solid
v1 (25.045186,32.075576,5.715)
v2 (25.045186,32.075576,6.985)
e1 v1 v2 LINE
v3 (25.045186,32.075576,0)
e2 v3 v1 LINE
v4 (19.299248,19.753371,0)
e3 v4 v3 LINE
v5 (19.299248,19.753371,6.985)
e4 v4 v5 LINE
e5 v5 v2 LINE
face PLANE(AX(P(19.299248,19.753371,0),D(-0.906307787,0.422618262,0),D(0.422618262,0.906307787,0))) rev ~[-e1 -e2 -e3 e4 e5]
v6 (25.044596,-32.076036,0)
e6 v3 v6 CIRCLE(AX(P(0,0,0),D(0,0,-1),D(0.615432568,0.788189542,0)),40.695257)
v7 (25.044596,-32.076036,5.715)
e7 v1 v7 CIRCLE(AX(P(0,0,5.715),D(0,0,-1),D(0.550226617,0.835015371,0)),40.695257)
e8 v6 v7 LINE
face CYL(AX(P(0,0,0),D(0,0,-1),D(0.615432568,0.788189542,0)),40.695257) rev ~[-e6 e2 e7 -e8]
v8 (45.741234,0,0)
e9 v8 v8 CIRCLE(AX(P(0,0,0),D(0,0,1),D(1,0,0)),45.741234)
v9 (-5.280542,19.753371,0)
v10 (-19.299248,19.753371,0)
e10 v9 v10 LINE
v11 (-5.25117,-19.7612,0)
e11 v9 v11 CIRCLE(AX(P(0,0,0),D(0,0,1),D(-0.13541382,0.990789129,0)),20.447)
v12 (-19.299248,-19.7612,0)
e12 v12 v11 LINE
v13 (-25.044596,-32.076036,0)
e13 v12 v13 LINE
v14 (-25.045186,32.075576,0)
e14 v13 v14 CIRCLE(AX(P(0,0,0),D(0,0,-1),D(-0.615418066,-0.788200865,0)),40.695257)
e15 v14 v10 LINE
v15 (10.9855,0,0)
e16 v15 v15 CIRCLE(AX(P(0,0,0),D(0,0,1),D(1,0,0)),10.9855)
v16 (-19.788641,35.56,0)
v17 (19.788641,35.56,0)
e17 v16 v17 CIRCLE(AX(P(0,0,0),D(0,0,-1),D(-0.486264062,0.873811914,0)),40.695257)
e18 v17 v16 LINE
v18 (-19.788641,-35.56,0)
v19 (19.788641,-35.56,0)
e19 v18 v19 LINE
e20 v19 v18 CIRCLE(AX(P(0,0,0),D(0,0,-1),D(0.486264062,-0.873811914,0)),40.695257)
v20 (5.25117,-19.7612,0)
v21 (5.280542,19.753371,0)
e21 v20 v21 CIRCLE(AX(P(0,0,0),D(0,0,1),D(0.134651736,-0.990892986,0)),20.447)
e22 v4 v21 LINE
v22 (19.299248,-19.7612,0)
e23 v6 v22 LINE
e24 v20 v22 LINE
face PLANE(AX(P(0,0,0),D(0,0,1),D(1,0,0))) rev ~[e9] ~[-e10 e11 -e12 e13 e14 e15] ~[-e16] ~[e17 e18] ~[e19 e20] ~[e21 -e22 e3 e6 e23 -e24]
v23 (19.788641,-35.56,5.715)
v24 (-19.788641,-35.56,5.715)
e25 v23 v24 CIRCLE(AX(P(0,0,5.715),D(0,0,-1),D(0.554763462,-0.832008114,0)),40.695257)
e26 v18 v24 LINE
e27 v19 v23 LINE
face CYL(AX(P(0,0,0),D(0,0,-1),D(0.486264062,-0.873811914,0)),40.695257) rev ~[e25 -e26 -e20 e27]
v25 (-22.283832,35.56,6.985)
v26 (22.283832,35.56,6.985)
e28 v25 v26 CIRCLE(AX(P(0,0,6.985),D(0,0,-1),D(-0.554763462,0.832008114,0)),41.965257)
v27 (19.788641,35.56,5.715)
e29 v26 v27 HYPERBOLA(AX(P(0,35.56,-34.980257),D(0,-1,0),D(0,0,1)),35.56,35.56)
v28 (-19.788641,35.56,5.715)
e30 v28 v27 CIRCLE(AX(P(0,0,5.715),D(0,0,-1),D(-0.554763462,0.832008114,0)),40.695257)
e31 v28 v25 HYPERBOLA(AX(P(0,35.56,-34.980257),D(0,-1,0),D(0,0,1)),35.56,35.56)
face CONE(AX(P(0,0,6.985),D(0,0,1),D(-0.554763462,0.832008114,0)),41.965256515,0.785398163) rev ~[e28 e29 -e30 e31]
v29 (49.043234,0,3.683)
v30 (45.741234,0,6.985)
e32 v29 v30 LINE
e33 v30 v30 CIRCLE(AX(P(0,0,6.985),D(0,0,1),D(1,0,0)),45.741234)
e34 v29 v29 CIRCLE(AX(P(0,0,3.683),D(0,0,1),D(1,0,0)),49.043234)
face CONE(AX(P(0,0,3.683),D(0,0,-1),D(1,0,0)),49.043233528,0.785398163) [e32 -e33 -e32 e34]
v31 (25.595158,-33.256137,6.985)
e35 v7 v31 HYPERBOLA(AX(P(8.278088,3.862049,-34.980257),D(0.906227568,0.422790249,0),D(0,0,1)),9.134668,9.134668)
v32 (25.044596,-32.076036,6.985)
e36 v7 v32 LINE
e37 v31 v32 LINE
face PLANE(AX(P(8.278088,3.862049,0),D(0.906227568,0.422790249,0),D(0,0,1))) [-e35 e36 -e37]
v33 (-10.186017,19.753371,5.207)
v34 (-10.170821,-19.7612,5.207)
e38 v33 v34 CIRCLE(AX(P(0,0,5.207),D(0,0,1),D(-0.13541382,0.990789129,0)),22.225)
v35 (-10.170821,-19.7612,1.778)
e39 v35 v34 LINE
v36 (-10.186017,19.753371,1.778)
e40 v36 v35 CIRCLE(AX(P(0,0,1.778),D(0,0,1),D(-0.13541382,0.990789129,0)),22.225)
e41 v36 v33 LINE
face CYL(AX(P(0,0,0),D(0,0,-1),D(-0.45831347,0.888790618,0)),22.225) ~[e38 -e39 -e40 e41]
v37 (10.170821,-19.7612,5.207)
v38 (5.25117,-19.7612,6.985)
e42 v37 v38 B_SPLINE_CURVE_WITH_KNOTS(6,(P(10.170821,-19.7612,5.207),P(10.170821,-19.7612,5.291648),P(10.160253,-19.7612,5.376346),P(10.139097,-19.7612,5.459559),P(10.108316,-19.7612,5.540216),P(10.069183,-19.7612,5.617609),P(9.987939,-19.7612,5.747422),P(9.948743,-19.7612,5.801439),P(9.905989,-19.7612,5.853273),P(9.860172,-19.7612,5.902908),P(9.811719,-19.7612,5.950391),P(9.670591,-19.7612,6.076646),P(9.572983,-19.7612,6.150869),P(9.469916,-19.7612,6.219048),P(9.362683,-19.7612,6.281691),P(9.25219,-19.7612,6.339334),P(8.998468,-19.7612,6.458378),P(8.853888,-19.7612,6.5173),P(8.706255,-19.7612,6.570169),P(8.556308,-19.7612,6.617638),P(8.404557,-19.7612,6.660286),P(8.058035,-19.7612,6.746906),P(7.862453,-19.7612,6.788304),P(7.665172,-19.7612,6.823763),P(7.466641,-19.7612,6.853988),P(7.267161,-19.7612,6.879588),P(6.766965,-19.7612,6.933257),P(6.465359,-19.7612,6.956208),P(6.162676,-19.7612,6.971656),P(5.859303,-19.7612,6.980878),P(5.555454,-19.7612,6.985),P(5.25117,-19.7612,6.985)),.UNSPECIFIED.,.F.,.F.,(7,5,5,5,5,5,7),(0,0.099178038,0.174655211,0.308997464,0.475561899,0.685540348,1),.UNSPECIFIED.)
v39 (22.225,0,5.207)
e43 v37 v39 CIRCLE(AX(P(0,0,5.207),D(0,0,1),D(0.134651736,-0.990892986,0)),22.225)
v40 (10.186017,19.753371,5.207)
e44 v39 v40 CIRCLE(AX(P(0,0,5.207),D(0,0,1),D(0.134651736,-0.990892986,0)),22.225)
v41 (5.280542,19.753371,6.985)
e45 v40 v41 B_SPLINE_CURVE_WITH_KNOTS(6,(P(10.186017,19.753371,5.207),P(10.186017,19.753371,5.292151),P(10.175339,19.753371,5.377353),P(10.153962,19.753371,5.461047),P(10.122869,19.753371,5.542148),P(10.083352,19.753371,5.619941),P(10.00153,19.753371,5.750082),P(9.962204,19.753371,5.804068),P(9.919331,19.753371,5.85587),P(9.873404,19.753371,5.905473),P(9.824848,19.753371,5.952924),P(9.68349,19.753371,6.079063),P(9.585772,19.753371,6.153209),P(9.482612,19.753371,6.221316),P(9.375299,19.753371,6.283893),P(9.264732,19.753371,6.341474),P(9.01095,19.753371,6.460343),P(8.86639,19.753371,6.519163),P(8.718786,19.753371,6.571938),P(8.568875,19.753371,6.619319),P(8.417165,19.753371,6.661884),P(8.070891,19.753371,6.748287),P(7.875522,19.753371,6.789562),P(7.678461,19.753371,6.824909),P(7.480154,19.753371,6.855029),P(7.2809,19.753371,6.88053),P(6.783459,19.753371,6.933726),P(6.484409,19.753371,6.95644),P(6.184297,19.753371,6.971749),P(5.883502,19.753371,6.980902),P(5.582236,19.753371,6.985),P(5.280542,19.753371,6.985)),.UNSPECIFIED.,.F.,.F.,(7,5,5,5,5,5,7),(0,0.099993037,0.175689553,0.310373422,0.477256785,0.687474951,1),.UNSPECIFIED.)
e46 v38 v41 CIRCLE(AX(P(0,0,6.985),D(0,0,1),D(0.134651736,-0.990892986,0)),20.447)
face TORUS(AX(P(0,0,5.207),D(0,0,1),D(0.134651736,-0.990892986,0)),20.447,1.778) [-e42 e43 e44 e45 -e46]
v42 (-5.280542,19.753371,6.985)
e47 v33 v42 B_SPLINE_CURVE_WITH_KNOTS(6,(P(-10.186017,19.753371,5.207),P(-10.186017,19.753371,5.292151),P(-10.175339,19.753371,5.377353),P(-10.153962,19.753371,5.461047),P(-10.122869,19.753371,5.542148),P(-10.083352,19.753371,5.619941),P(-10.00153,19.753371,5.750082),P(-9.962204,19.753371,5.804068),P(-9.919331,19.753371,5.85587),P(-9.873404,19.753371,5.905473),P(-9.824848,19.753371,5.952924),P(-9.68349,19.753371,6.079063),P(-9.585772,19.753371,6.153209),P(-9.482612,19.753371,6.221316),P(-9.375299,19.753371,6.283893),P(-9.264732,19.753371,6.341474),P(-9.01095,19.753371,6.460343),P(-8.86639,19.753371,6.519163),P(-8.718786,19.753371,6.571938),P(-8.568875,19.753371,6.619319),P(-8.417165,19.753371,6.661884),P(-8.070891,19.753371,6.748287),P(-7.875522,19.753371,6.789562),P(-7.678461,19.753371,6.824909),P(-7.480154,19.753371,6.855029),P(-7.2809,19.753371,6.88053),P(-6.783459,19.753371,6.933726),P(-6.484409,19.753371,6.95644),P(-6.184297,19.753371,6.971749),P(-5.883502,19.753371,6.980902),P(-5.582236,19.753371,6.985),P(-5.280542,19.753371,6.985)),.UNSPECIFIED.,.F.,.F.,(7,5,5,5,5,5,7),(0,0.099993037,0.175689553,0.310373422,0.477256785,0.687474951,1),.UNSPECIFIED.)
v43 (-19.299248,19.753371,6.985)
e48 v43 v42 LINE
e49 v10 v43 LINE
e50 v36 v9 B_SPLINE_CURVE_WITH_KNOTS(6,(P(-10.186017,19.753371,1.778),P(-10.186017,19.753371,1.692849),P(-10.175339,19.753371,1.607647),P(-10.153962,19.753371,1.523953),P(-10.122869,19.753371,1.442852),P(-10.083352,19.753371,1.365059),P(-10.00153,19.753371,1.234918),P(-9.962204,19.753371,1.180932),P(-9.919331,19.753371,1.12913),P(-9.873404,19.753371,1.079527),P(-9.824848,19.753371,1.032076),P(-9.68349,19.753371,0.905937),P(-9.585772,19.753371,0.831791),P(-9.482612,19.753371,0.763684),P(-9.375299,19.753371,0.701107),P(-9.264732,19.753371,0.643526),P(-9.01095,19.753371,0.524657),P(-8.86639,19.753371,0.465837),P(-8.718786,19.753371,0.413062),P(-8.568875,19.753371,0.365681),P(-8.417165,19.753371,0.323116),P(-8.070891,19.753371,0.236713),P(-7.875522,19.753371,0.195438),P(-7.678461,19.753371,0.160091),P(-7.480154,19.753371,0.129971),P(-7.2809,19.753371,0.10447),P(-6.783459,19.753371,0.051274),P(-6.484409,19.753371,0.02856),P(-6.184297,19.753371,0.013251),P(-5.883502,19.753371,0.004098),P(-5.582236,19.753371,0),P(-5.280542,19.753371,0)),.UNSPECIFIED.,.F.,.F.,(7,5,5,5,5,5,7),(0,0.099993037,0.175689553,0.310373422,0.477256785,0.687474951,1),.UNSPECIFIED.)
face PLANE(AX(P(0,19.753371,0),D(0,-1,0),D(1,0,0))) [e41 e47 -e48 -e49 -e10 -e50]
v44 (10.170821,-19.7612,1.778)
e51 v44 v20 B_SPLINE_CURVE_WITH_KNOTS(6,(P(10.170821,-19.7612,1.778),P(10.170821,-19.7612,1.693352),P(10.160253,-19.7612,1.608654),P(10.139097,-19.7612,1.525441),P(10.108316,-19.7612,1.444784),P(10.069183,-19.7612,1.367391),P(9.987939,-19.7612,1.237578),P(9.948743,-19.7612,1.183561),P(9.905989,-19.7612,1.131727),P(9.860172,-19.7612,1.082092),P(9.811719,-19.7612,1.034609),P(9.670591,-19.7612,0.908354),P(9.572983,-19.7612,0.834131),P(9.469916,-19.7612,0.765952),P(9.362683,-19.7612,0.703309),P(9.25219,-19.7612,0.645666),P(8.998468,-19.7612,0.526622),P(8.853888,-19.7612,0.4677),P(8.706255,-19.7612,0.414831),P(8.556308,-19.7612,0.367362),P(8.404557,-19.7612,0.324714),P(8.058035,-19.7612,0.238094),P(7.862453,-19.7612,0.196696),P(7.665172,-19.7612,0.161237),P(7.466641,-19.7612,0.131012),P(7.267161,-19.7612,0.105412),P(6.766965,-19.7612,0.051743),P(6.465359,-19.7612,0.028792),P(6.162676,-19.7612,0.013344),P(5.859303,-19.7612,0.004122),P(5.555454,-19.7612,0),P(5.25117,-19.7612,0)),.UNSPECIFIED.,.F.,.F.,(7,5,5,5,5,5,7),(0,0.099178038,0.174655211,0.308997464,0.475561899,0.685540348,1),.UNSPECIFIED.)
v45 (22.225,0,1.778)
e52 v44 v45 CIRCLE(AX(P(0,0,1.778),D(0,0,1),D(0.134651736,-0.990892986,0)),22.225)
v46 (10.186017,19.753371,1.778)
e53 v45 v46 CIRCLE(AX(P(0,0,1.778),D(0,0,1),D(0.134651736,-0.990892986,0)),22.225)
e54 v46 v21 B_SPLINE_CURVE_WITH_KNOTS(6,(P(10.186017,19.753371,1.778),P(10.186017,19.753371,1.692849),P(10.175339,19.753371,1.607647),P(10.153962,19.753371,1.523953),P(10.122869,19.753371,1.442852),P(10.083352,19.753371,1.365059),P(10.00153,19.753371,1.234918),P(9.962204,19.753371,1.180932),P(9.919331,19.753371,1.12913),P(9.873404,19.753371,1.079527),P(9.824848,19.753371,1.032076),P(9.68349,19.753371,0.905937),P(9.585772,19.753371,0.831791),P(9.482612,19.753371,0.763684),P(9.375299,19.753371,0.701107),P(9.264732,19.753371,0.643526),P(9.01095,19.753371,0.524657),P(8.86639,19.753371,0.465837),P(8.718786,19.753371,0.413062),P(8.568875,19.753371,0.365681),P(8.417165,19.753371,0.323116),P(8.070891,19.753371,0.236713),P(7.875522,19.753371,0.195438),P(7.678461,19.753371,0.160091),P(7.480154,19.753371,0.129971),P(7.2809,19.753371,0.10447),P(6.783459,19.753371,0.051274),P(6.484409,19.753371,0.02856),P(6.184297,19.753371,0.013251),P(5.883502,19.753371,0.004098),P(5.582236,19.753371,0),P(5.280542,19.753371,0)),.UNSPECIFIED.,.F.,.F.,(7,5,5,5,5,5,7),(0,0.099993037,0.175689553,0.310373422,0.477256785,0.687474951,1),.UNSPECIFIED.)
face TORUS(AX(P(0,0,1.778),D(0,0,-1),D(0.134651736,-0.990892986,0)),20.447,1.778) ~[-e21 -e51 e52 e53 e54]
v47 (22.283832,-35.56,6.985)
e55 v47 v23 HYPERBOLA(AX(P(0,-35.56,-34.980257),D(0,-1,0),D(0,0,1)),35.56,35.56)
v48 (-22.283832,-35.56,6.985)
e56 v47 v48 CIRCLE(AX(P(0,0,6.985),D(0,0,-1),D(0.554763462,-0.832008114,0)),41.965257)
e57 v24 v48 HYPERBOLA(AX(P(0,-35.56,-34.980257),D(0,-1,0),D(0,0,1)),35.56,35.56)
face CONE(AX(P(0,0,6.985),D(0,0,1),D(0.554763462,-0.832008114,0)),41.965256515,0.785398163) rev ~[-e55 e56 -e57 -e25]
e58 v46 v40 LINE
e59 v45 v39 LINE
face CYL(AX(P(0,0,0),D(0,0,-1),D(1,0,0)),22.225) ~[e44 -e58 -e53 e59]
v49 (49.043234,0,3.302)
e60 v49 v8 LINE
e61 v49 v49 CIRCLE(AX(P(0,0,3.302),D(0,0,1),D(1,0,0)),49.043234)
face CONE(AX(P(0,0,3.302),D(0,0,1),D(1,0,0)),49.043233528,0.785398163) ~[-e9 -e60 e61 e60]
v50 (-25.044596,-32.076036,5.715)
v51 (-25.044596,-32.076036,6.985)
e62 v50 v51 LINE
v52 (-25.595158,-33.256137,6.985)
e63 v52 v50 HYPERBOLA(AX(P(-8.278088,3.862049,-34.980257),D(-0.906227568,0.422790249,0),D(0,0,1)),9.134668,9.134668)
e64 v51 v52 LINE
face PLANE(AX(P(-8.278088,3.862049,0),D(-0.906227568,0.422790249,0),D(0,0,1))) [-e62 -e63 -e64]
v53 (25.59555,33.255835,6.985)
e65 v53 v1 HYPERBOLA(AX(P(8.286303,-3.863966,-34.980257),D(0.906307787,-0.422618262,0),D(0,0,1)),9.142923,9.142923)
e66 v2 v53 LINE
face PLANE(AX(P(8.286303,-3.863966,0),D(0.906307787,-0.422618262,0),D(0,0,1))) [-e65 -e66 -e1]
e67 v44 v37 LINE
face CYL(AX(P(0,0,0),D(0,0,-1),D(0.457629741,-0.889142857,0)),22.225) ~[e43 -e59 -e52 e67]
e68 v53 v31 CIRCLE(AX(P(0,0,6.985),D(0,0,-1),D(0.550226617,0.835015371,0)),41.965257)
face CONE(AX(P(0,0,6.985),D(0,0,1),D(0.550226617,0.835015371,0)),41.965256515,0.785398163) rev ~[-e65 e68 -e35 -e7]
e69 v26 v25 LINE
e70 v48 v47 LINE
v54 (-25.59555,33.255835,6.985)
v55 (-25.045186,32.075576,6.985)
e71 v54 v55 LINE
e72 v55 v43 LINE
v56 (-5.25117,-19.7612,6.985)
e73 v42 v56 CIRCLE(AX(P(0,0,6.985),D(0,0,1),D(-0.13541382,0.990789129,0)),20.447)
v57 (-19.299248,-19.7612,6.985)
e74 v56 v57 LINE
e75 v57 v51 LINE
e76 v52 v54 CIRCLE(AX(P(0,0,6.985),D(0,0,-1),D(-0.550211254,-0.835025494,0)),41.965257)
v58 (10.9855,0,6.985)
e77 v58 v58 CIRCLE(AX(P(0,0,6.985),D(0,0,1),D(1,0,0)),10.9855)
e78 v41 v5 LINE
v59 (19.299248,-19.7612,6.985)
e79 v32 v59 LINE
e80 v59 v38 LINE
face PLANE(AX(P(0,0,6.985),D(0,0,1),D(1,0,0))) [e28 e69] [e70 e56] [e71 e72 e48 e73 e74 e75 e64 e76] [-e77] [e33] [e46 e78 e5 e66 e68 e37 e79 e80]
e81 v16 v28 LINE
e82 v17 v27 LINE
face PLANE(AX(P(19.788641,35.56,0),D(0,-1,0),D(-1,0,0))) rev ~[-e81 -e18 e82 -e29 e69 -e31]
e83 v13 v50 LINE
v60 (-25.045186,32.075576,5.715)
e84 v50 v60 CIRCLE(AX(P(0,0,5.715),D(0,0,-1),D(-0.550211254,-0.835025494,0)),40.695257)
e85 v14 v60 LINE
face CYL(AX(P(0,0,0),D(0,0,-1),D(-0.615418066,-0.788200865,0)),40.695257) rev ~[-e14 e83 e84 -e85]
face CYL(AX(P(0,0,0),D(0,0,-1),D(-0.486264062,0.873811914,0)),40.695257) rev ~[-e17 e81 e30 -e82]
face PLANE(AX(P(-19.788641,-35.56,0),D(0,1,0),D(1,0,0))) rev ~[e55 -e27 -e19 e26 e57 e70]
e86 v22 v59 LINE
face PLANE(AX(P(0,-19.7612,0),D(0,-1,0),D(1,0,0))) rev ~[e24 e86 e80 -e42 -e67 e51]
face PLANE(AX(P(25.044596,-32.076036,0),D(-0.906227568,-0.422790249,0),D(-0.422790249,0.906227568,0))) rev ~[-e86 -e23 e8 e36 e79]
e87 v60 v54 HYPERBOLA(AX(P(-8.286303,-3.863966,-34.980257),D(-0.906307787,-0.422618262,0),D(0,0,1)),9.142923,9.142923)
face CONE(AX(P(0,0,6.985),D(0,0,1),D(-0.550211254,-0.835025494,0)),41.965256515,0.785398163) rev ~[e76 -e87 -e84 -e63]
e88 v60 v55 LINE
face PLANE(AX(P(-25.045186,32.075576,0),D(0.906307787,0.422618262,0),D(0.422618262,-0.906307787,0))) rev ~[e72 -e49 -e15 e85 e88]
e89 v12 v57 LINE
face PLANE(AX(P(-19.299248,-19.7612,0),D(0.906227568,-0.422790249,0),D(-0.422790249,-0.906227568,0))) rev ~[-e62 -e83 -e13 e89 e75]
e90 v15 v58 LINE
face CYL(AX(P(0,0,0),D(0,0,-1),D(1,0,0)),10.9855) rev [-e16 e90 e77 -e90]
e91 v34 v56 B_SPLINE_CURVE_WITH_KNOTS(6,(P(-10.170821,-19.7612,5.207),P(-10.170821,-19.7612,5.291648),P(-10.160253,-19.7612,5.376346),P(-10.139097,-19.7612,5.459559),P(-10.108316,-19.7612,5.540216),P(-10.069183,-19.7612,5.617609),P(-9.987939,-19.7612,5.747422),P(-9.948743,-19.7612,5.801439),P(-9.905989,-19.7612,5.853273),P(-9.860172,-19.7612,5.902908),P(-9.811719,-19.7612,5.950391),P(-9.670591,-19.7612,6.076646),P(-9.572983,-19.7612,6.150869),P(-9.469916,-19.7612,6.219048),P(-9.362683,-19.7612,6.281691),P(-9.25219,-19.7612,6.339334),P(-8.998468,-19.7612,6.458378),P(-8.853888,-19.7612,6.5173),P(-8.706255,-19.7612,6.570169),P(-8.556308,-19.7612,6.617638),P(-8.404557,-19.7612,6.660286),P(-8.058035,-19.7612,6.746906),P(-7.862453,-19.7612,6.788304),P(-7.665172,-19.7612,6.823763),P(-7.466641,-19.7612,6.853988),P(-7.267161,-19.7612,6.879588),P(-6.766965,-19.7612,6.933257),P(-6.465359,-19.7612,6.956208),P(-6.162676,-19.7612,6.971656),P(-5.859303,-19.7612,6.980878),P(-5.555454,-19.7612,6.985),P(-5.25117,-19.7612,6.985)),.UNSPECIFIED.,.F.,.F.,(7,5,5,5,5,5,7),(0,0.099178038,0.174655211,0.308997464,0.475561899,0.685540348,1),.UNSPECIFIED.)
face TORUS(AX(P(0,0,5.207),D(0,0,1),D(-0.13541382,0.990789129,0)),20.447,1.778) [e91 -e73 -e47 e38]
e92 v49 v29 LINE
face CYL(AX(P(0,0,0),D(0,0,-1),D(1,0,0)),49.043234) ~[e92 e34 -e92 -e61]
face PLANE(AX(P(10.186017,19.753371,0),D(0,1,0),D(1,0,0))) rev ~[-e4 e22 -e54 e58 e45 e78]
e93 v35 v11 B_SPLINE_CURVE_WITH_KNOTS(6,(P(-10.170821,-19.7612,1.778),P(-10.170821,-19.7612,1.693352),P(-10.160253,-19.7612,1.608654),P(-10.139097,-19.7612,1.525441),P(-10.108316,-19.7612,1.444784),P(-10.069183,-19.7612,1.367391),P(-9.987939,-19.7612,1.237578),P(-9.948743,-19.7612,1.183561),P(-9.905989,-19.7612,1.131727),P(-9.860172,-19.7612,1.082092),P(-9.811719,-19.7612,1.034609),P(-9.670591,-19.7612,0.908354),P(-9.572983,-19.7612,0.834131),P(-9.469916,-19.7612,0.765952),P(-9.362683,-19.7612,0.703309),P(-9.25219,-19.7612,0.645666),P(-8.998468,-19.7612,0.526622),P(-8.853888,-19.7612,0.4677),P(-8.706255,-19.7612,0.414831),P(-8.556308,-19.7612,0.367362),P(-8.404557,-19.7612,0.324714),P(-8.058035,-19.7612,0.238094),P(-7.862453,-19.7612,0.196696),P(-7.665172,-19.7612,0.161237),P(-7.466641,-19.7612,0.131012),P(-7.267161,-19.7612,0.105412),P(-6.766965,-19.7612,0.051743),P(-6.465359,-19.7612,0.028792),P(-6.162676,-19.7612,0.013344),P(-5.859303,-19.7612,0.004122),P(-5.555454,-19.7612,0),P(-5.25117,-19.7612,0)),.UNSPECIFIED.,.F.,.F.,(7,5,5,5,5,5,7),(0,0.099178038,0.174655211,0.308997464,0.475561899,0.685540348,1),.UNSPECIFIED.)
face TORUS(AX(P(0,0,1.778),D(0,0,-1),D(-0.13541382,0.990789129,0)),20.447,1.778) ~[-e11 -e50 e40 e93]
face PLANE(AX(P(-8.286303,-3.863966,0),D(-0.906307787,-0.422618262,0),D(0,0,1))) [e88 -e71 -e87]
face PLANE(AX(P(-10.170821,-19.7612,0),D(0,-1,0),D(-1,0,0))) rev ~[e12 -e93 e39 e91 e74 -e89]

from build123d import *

# Parameters (mm, degrees)
F0_R         = 49.0432335283
F0_R_2       = 10.9855
F1_DEPTH     = 6.985
F2_T4_ANGLE  = 164.4789683114
F2_T10_ANGLE = 164.4789683114
F2_T16_ANGLE = 164.4789683114
F2_T22_ANGLE = 164.4789683114
F3_T4_ANGLE  = 113.2359316918
F3_T10_ANGLE = 67.3888483325
F3_T15_ANGLE = 113.2359316918
F3_T21_ANGLE = 67.3888483325
F4_SIZE      = 3.302


# Not quite as in the source:
# - a fillet or chamfer that OpenCascade refuses, or shapes differently, is made with other operations: its cross-section is extruded or revolved along the edge and cut away or added


with BuildPart() as f1:
    # F0 (on Top) → F1 (new body)
    with BuildSketch(Plane.XY):
        Circle(F0_R)
        with BuildLine():
            Line((26.67, 35.56), (25.0451862182, 32.0755756003))
            ThreePointArc((25.0451862182, 32.0755756003), (36.5740630803, 17.8449380104), (40.6952565147, 0))
            ThreePointArc((40.6952565147, 0), (36.5738989199, -17.8452744611), (25.0445960757, -32.0760363854))
            Line((25.0445960757, -32.0760363854), (26.67, -35.56))
            Line((26.67, -35.56), (19.7886407516, -35.56))
            ThreePointArc((19.7886407516, -35.56), (0, -40.6952565147), (-19.7886407516, -35.56))
            Line((-19.7886407516, -35.56), (-26.67, -35.56))
            Line((-26.67, -35.56), (-25.0445960757, -32.0760363854))
            ThreePointArc((-25.0445960757, -32.0760363854), (-40.695256513, -0.0003743631), (-25.0451862182, 32.0755756003))
            Line((-25.0451862182, 32.0755756003), (-26.67, 35.56))
            Line((-26.67, 35.56), (-19.7886407516, 35.56))
            ThreePointArc((-19.7886407516, 35.56), (0, 40.6952565147), (19.7886407516, 35.56))
            Line((19.7886407516, 35.56), (26.67, 35.56))
        make_face(mode=Mode.SUBTRACT)
        with BuildLine():
            ThreePointArc((-10.1860168797, 19.7533714876), (0, 22.225), (10.1860168797, 19.7533714876))
            Line((10.1860168797, 19.7533714876), (19.299248075, 19.7533714876))
            Line((19.299248075, 19.7533714876), (25.0451862182, 32.0755756003))
            ThreePointArc((25.0451862182, 32.0755756003), (22.4845127485, 33.9197669399), (19.7886407516, 35.56))
            Line((19.7886407516, 35.56), (-19.7886407516, 35.56))
            ThreePointArc((-19.7886407516, 35.56), (-22.4845127485, 33.9197669399), (-25.0451862182, 32.0755756003))
            Line((-25.0451862182, 32.0755756003), (-19.299248075, 19.7533714876))
            Line((-19.299248075, 19.7533714876), (-10.1860168797, 19.7533714876))
        make_face()
        with BuildLine():
            Line((-26.67, 35.56), (-25.0451862182, 32.0755756003))
            ThreePointArc((-25.0451862182, 32.0755756003), (-22.4845127485, 33.9197669399), (-19.7886407516, 35.56))
            Line((-19.7886407516, 35.56), (-26.67, 35.56))
        make_face()
        with BuildLine():
            ThreePointArc((19.7886407516, 35.56), (22.4845127485, 33.9197669399), (25.0451862182, 32.0755756003))
            Line((25.0451862182, 32.0755756003), (26.67, 35.56))
            Line((26.67, 35.56), (19.7886407516, 35.56))
        make_face()
        with BuildLine():
            ThreePointArc((10.1708209875, -19.7612), (18.9736280327, -11.5737662097), (22.225, 0))
            ThreePointArc((22.225, 0), (18.9780774863, 11.5664687751), (10.1860168797, 19.7533714876))
            Line((10.1860168797, 19.7533714876), (0, 19.7533714876))
            Line((0, 19.7533714876), (-10.1860168797, 19.7533714876))
            ThreePointArc((-10.1860168797, 19.7533714876), (-22.2249983566, -0.0085469402), (-10.1708209875, -19.7612))
            Line((-10.1708209875, -19.7612), (0, -19.7612))
            Line((0, -19.7612), (10.1708209875, -19.7612))
        make_face()
        Circle(F0_R_2, mode=Mode.SUBTRACT)
        with BuildLine():
            Line((0, 19.7533714876), (10.1860168797, 19.7533714876))
            ThreePointArc((10.1860168797, 19.7533714876), (0, 22.225), (-10.1860168797, 19.7533714876))
            Line((-10.1860168797, 19.7533714876), (0, 19.7533714876))
        make_face()
        with BuildLine():
            Line((19.299248075, -19.7612), (10.1708209875, -19.7612))
            ThreePointArc((10.1708209875, -19.7612), (0, -22.225), (-10.1708209875, -19.7612))
            Line((-10.1708209875, -19.7612), (-19.299248075, -19.7612))
            Line((-19.299248075, -19.7612), (-25.0445960757, -32.0760363854))
            ThreePointArc((-25.0445960757, -32.0760363854), (-22.4842007134, -33.9199737776), (-19.7886407516, -35.56))
            Line((-19.7886407516, -35.56), (19.7886407516, -35.56))
            ThreePointArc((19.7886407516, -35.56), (22.4842007134, -33.9199737776), (25.0445960757, -32.0760363854))
            Line((25.0445960757, -32.0760363854), (19.299248075, -19.7612))
        make_face()
        with BuildLine():
            ThreePointArc((-10.1708209875, -19.7612), (0, -22.225), (10.1708209875, -19.7612))
            Line((10.1708209875, -19.7612), (0, -19.7612))
            Line((0, -19.7612), (-10.1708209875, -19.7612))
        make_face()
        with BuildLine():
            ThreePointArc((-19.7886407516, -35.56), (-22.4842007134, -33.9199737776), (-25.0445960757, -32.0760363854))
            Line((-25.0445960757, -32.0760363854), (-26.67, -35.56))
            Line((-26.67, -35.56), (-19.7886407516, -35.56))
        make_face()
        with BuildLine():
            Line((26.67, -35.56), (25.0445960757, -32.0760363854))
            ThreePointArc((25.0445960757, -32.0760363854), (22.4842007134, -33.9199737776), (19.7886407516, -35.56))
            Line((19.7886407516, -35.56), (26.67, -35.56))
        make_face()
    extrude(amount=F1_DEPTH)

    # F2: fillet of radius 1.778 on 4 edges, made by hand


with BuildPart() as f2_tool2:
    # F2_s3 → F2_t4 (revolve)
    with BuildSketch(Plane(origin=(0, 0, 0), x_dir=(0, 0, 1), z_dir=(0.9907891286, 0.1354138197, 0))):
        with BuildLine():
            ThreePointArc((5.207, -22.225), (6.4642358569, -21.7042358569), (6.985, -20.447))
            Line((6.985, -20.447), (6.985, -22.225))
            Line((6.985, -22.225), (5.207, -22.225))
        make_face()
    revolve(axis=Axis((0, 0, 6.985), (0, 0, 1)), revolution_arc=F2_T4_ANGLE)

    split(bisect_by=Plane.XZ.offset(-19.7533714876), keep=Keep.TOP)

    split(bisect_by=Plane.XZ.offset(19.7612), keep=Keep.BOTTOM)


with BuildPart() as f1_1:
    add(f1.part)

    # F2_t1: cut F2_tool2
    add(f2_tool2.part, mode=Mode.SUBTRACT)


with BuildPart() as f2_tool8:
    # F2_s9 → F2_t10 (revolve)
    with BuildSketch(Plane(origin=(0, 0, 0), x_dir=(0, 0, 1), z_dir=(-0.9908929862, -0.1346517356, 0))):
        with BuildLine():
            ThreePointArc((5.207, -22.225), (6.4642358569, -21.7042358569), (6.985, -20.447))
            Line((6.985, -20.447), (6.985, -22.225))
            Line((6.985, -22.225), (5.207, -22.225))
        make_face()
    revolve(axis=Axis((0, 0, 6.985), (0, 0, 1)), revolution_arc=F2_T10_ANGLE)

    split(bisect_by=Plane.XZ.offset(19.7612), keep=Keep.BOTTOM)

    split(bisect_by=Plane.XZ.offset(-19.7533714876), keep=Keep.TOP)


with BuildPart() as f1_2:
    add(f1_1.part)

    # F2_t7: cut F2_tool8
    add(f2_tool8.part, mode=Mode.SUBTRACT)


with BuildPart() as f2_tool14:
    # F2_s15 → F2_t16 (revolve)
    with BuildSketch(Plane(origin=(0, 0, 0), x_dir=(0, 0, 1), z_dir=(-0.9908929862, -0.1346517356, 0))):
        with BuildLine():
            ThreePointArc((1.778, -22.225), (0.5207641431, -21.7042358569), (0, -20.447))
            Line((0, -20.447), (0, -22.225))
            Line((0, -22.225), (1.778, -22.225))
        make_face()
    revolve(axis=Axis((0, 0, 0), (0, 0, 1)), revolution_arc=F2_T16_ANGLE)

    split(bisect_by=Plane.XZ.offset(19.7612), keep=Keep.BOTTOM)

    split(bisect_by=Plane.XZ.offset(-19.7533714876), keep=Keep.TOP)


with BuildPart() as f1_3:
    add(f1_2.part)

    # F2_t13: cut F2_tool14
    add(f2_tool14.part, mode=Mode.SUBTRACT)


with BuildPart() as f2_tool20:
    # F2_s21 → F2_t22 (revolve)
    with BuildSketch(Plane(origin=(0, 0, 0), x_dir=(0, 0, 1), z_dir=(0.9907891286, 0.1354138197, 0))):
        with BuildLine():
            ThreePointArc((1.778, -22.225), (0.5207641431, -21.7042358569), (0, -20.447))
            Line((0, -20.447), (0, -22.225))
            Line((0, -22.225), (1.778, -22.225))
        make_face()
    revolve(axis=Axis((0, 0, 0), (0, 0, 1)), revolution_arc=F2_T22_ANGLE)

    split(bisect_by=Plane.XZ.offset(-19.7533714876), keep=Keep.TOP)

    split(bisect_by=Plane.XZ.offset(19.7612), keep=Keep.BOTTOM)


with BuildPart() as f1_4:
    add(f1_3.part)

    # F2_t19: cut F2_tool20
    add(f2_tool20.part, mode=Mode.SUBTRACT)

    # F3: chamfer of 1.27 on 4 edges, made by hand


with BuildPart() as f3_tool2:
    # F3_s3 → F3_t4 (revolve)
    with BuildSketch(Plane(origin=(0, 0, 0), x_dir=(0, 0, 1), z_dir=(0.8350254942, -0.550211254, 0))):
        Polygon((6.985, 41.9652565147), (5.715, 40.6952565147), (6.985, 40.6952565147), align=None)
    revolve(axis=Axis((0, 0, 6.985), (0, 0, -1)), revolution_arc=F3_T4_ANGLE)

    split(bisect_by=Plane(origin=(-8.2863025765, -3.8639663492, 0), x_dir=(0, 0, 1), z_dir=(-0.906307787, -0.4226182617, 0)), keep=Keep.TOP)

    split(bisect_by=Plane(origin=(-8.2780879413, 3.8620485498, 0), x_dir=(0, 0, 1), z_dir=(-0.906227568, 0.4227902494, 0)), keep=Keep.TOP)


with BuildPart() as f1_5:
    add(f1_4.part)

    # F3_t1: cut F3_tool2
    add(f3_tool2.part, mode=Mode.SUBTRACT)


with BuildPart() as f3_tool8:
    # F3_s9 → F3_t10 (revolve)
    with BuildSketch(Plane(origin=(0, 0, 0), x_dir=(0, 0, 1), z_dir=(-0.8320081138, -0.5547634618, 0))):
        Polygon((6.985, 41.9652565147), (5.715, 40.6952565147), (6.985, 40.6952565147), align=None)
    revolve(axis=Axis((0, 0, 6.985), (0, 0, -1)), revolution_arc=F3_T10_ANGLE)

    split(bisect_by=Plane.XZ.offset(-35.56), keep=Keep.BOTTOM)


with BuildPart() as f1_6:
    add(f1_5.part)

    # F3_t7: cut F3_tool8
    add(f3_tool8.part, mode=Mode.SUBTRACT)


with BuildPart() as f3_tool13:
    # F3_s14 → F3_t15 (revolve)
    with BuildSketch(Plane(origin=(0, 0, 0), x_dir=(0, 0, 1), z_dir=(-0.8350153711, 0.550226617, 0))):
        Polygon((6.985, 41.9652565147), (5.715, 40.6952565147), (6.985, 40.6952565147), align=None)
    revolve(axis=Axis((0, 0, 6.985), (0, 0, -1)), revolution_arc=F3_T15_ANGLE)

    split(bisect_by=Plane(origin=(8.2780879413, 3.8620485498, 0), x_dir=(0, 0, 1), z_dir=(0.906227568, 0.4227902494, 0)), keep=Keep.TOP)

    split(bisect_by=Plane(origin=(8.2863025765, -3.8639663492, 0), x_dir=(0, 0, 1), z_dir=(0.906307787, -0.4226182617, 0)), keep=Keep.TOP)


with BuildPart() as f1_7:
    add(f1_6.part)

    # F3_t12: cut F3_tool13
    add(f3_tool13.part, mode=Mode.SUBTRACT)


with BuildPart() as f3_tool19:
    # F3_s20 → F3_t21 (revolve)
    with BuildSketch(Plane(origin=(0, 0, 0), x_dir=(0, 0, 1), z_dir=(0.8320081138, 0.5547634618, 0))):
        Polygon((6.985, 41.9652565147), (5.715, 40.6952565147), (6.985, 40.6952565147), align=None)
    revolve(axis=Axis((0, 0, 6.985), (0, 0, -1)), revolution_arc=F3_T21_ANGLE)

    split(bisect_by=Plane.XZ.offset(35.56), keep=Keep.TOP)


with BuildPart() as f1_8:
    add(f1_7.part)

    # F3_t18: cut F3_tool19
    add(f3_tool19.part, mode=Mode.SUBTRACT)

    # F4
    f4_edges = [f1_8.edges().sort_by_distance(p)[0] for p in [
        (-49.043234, 0, 6.985),
        (-49.043234, 0, 0),
    ]]
    chamfer(f4_edges, length=F4_SIZE)


solid = f1_8.part
